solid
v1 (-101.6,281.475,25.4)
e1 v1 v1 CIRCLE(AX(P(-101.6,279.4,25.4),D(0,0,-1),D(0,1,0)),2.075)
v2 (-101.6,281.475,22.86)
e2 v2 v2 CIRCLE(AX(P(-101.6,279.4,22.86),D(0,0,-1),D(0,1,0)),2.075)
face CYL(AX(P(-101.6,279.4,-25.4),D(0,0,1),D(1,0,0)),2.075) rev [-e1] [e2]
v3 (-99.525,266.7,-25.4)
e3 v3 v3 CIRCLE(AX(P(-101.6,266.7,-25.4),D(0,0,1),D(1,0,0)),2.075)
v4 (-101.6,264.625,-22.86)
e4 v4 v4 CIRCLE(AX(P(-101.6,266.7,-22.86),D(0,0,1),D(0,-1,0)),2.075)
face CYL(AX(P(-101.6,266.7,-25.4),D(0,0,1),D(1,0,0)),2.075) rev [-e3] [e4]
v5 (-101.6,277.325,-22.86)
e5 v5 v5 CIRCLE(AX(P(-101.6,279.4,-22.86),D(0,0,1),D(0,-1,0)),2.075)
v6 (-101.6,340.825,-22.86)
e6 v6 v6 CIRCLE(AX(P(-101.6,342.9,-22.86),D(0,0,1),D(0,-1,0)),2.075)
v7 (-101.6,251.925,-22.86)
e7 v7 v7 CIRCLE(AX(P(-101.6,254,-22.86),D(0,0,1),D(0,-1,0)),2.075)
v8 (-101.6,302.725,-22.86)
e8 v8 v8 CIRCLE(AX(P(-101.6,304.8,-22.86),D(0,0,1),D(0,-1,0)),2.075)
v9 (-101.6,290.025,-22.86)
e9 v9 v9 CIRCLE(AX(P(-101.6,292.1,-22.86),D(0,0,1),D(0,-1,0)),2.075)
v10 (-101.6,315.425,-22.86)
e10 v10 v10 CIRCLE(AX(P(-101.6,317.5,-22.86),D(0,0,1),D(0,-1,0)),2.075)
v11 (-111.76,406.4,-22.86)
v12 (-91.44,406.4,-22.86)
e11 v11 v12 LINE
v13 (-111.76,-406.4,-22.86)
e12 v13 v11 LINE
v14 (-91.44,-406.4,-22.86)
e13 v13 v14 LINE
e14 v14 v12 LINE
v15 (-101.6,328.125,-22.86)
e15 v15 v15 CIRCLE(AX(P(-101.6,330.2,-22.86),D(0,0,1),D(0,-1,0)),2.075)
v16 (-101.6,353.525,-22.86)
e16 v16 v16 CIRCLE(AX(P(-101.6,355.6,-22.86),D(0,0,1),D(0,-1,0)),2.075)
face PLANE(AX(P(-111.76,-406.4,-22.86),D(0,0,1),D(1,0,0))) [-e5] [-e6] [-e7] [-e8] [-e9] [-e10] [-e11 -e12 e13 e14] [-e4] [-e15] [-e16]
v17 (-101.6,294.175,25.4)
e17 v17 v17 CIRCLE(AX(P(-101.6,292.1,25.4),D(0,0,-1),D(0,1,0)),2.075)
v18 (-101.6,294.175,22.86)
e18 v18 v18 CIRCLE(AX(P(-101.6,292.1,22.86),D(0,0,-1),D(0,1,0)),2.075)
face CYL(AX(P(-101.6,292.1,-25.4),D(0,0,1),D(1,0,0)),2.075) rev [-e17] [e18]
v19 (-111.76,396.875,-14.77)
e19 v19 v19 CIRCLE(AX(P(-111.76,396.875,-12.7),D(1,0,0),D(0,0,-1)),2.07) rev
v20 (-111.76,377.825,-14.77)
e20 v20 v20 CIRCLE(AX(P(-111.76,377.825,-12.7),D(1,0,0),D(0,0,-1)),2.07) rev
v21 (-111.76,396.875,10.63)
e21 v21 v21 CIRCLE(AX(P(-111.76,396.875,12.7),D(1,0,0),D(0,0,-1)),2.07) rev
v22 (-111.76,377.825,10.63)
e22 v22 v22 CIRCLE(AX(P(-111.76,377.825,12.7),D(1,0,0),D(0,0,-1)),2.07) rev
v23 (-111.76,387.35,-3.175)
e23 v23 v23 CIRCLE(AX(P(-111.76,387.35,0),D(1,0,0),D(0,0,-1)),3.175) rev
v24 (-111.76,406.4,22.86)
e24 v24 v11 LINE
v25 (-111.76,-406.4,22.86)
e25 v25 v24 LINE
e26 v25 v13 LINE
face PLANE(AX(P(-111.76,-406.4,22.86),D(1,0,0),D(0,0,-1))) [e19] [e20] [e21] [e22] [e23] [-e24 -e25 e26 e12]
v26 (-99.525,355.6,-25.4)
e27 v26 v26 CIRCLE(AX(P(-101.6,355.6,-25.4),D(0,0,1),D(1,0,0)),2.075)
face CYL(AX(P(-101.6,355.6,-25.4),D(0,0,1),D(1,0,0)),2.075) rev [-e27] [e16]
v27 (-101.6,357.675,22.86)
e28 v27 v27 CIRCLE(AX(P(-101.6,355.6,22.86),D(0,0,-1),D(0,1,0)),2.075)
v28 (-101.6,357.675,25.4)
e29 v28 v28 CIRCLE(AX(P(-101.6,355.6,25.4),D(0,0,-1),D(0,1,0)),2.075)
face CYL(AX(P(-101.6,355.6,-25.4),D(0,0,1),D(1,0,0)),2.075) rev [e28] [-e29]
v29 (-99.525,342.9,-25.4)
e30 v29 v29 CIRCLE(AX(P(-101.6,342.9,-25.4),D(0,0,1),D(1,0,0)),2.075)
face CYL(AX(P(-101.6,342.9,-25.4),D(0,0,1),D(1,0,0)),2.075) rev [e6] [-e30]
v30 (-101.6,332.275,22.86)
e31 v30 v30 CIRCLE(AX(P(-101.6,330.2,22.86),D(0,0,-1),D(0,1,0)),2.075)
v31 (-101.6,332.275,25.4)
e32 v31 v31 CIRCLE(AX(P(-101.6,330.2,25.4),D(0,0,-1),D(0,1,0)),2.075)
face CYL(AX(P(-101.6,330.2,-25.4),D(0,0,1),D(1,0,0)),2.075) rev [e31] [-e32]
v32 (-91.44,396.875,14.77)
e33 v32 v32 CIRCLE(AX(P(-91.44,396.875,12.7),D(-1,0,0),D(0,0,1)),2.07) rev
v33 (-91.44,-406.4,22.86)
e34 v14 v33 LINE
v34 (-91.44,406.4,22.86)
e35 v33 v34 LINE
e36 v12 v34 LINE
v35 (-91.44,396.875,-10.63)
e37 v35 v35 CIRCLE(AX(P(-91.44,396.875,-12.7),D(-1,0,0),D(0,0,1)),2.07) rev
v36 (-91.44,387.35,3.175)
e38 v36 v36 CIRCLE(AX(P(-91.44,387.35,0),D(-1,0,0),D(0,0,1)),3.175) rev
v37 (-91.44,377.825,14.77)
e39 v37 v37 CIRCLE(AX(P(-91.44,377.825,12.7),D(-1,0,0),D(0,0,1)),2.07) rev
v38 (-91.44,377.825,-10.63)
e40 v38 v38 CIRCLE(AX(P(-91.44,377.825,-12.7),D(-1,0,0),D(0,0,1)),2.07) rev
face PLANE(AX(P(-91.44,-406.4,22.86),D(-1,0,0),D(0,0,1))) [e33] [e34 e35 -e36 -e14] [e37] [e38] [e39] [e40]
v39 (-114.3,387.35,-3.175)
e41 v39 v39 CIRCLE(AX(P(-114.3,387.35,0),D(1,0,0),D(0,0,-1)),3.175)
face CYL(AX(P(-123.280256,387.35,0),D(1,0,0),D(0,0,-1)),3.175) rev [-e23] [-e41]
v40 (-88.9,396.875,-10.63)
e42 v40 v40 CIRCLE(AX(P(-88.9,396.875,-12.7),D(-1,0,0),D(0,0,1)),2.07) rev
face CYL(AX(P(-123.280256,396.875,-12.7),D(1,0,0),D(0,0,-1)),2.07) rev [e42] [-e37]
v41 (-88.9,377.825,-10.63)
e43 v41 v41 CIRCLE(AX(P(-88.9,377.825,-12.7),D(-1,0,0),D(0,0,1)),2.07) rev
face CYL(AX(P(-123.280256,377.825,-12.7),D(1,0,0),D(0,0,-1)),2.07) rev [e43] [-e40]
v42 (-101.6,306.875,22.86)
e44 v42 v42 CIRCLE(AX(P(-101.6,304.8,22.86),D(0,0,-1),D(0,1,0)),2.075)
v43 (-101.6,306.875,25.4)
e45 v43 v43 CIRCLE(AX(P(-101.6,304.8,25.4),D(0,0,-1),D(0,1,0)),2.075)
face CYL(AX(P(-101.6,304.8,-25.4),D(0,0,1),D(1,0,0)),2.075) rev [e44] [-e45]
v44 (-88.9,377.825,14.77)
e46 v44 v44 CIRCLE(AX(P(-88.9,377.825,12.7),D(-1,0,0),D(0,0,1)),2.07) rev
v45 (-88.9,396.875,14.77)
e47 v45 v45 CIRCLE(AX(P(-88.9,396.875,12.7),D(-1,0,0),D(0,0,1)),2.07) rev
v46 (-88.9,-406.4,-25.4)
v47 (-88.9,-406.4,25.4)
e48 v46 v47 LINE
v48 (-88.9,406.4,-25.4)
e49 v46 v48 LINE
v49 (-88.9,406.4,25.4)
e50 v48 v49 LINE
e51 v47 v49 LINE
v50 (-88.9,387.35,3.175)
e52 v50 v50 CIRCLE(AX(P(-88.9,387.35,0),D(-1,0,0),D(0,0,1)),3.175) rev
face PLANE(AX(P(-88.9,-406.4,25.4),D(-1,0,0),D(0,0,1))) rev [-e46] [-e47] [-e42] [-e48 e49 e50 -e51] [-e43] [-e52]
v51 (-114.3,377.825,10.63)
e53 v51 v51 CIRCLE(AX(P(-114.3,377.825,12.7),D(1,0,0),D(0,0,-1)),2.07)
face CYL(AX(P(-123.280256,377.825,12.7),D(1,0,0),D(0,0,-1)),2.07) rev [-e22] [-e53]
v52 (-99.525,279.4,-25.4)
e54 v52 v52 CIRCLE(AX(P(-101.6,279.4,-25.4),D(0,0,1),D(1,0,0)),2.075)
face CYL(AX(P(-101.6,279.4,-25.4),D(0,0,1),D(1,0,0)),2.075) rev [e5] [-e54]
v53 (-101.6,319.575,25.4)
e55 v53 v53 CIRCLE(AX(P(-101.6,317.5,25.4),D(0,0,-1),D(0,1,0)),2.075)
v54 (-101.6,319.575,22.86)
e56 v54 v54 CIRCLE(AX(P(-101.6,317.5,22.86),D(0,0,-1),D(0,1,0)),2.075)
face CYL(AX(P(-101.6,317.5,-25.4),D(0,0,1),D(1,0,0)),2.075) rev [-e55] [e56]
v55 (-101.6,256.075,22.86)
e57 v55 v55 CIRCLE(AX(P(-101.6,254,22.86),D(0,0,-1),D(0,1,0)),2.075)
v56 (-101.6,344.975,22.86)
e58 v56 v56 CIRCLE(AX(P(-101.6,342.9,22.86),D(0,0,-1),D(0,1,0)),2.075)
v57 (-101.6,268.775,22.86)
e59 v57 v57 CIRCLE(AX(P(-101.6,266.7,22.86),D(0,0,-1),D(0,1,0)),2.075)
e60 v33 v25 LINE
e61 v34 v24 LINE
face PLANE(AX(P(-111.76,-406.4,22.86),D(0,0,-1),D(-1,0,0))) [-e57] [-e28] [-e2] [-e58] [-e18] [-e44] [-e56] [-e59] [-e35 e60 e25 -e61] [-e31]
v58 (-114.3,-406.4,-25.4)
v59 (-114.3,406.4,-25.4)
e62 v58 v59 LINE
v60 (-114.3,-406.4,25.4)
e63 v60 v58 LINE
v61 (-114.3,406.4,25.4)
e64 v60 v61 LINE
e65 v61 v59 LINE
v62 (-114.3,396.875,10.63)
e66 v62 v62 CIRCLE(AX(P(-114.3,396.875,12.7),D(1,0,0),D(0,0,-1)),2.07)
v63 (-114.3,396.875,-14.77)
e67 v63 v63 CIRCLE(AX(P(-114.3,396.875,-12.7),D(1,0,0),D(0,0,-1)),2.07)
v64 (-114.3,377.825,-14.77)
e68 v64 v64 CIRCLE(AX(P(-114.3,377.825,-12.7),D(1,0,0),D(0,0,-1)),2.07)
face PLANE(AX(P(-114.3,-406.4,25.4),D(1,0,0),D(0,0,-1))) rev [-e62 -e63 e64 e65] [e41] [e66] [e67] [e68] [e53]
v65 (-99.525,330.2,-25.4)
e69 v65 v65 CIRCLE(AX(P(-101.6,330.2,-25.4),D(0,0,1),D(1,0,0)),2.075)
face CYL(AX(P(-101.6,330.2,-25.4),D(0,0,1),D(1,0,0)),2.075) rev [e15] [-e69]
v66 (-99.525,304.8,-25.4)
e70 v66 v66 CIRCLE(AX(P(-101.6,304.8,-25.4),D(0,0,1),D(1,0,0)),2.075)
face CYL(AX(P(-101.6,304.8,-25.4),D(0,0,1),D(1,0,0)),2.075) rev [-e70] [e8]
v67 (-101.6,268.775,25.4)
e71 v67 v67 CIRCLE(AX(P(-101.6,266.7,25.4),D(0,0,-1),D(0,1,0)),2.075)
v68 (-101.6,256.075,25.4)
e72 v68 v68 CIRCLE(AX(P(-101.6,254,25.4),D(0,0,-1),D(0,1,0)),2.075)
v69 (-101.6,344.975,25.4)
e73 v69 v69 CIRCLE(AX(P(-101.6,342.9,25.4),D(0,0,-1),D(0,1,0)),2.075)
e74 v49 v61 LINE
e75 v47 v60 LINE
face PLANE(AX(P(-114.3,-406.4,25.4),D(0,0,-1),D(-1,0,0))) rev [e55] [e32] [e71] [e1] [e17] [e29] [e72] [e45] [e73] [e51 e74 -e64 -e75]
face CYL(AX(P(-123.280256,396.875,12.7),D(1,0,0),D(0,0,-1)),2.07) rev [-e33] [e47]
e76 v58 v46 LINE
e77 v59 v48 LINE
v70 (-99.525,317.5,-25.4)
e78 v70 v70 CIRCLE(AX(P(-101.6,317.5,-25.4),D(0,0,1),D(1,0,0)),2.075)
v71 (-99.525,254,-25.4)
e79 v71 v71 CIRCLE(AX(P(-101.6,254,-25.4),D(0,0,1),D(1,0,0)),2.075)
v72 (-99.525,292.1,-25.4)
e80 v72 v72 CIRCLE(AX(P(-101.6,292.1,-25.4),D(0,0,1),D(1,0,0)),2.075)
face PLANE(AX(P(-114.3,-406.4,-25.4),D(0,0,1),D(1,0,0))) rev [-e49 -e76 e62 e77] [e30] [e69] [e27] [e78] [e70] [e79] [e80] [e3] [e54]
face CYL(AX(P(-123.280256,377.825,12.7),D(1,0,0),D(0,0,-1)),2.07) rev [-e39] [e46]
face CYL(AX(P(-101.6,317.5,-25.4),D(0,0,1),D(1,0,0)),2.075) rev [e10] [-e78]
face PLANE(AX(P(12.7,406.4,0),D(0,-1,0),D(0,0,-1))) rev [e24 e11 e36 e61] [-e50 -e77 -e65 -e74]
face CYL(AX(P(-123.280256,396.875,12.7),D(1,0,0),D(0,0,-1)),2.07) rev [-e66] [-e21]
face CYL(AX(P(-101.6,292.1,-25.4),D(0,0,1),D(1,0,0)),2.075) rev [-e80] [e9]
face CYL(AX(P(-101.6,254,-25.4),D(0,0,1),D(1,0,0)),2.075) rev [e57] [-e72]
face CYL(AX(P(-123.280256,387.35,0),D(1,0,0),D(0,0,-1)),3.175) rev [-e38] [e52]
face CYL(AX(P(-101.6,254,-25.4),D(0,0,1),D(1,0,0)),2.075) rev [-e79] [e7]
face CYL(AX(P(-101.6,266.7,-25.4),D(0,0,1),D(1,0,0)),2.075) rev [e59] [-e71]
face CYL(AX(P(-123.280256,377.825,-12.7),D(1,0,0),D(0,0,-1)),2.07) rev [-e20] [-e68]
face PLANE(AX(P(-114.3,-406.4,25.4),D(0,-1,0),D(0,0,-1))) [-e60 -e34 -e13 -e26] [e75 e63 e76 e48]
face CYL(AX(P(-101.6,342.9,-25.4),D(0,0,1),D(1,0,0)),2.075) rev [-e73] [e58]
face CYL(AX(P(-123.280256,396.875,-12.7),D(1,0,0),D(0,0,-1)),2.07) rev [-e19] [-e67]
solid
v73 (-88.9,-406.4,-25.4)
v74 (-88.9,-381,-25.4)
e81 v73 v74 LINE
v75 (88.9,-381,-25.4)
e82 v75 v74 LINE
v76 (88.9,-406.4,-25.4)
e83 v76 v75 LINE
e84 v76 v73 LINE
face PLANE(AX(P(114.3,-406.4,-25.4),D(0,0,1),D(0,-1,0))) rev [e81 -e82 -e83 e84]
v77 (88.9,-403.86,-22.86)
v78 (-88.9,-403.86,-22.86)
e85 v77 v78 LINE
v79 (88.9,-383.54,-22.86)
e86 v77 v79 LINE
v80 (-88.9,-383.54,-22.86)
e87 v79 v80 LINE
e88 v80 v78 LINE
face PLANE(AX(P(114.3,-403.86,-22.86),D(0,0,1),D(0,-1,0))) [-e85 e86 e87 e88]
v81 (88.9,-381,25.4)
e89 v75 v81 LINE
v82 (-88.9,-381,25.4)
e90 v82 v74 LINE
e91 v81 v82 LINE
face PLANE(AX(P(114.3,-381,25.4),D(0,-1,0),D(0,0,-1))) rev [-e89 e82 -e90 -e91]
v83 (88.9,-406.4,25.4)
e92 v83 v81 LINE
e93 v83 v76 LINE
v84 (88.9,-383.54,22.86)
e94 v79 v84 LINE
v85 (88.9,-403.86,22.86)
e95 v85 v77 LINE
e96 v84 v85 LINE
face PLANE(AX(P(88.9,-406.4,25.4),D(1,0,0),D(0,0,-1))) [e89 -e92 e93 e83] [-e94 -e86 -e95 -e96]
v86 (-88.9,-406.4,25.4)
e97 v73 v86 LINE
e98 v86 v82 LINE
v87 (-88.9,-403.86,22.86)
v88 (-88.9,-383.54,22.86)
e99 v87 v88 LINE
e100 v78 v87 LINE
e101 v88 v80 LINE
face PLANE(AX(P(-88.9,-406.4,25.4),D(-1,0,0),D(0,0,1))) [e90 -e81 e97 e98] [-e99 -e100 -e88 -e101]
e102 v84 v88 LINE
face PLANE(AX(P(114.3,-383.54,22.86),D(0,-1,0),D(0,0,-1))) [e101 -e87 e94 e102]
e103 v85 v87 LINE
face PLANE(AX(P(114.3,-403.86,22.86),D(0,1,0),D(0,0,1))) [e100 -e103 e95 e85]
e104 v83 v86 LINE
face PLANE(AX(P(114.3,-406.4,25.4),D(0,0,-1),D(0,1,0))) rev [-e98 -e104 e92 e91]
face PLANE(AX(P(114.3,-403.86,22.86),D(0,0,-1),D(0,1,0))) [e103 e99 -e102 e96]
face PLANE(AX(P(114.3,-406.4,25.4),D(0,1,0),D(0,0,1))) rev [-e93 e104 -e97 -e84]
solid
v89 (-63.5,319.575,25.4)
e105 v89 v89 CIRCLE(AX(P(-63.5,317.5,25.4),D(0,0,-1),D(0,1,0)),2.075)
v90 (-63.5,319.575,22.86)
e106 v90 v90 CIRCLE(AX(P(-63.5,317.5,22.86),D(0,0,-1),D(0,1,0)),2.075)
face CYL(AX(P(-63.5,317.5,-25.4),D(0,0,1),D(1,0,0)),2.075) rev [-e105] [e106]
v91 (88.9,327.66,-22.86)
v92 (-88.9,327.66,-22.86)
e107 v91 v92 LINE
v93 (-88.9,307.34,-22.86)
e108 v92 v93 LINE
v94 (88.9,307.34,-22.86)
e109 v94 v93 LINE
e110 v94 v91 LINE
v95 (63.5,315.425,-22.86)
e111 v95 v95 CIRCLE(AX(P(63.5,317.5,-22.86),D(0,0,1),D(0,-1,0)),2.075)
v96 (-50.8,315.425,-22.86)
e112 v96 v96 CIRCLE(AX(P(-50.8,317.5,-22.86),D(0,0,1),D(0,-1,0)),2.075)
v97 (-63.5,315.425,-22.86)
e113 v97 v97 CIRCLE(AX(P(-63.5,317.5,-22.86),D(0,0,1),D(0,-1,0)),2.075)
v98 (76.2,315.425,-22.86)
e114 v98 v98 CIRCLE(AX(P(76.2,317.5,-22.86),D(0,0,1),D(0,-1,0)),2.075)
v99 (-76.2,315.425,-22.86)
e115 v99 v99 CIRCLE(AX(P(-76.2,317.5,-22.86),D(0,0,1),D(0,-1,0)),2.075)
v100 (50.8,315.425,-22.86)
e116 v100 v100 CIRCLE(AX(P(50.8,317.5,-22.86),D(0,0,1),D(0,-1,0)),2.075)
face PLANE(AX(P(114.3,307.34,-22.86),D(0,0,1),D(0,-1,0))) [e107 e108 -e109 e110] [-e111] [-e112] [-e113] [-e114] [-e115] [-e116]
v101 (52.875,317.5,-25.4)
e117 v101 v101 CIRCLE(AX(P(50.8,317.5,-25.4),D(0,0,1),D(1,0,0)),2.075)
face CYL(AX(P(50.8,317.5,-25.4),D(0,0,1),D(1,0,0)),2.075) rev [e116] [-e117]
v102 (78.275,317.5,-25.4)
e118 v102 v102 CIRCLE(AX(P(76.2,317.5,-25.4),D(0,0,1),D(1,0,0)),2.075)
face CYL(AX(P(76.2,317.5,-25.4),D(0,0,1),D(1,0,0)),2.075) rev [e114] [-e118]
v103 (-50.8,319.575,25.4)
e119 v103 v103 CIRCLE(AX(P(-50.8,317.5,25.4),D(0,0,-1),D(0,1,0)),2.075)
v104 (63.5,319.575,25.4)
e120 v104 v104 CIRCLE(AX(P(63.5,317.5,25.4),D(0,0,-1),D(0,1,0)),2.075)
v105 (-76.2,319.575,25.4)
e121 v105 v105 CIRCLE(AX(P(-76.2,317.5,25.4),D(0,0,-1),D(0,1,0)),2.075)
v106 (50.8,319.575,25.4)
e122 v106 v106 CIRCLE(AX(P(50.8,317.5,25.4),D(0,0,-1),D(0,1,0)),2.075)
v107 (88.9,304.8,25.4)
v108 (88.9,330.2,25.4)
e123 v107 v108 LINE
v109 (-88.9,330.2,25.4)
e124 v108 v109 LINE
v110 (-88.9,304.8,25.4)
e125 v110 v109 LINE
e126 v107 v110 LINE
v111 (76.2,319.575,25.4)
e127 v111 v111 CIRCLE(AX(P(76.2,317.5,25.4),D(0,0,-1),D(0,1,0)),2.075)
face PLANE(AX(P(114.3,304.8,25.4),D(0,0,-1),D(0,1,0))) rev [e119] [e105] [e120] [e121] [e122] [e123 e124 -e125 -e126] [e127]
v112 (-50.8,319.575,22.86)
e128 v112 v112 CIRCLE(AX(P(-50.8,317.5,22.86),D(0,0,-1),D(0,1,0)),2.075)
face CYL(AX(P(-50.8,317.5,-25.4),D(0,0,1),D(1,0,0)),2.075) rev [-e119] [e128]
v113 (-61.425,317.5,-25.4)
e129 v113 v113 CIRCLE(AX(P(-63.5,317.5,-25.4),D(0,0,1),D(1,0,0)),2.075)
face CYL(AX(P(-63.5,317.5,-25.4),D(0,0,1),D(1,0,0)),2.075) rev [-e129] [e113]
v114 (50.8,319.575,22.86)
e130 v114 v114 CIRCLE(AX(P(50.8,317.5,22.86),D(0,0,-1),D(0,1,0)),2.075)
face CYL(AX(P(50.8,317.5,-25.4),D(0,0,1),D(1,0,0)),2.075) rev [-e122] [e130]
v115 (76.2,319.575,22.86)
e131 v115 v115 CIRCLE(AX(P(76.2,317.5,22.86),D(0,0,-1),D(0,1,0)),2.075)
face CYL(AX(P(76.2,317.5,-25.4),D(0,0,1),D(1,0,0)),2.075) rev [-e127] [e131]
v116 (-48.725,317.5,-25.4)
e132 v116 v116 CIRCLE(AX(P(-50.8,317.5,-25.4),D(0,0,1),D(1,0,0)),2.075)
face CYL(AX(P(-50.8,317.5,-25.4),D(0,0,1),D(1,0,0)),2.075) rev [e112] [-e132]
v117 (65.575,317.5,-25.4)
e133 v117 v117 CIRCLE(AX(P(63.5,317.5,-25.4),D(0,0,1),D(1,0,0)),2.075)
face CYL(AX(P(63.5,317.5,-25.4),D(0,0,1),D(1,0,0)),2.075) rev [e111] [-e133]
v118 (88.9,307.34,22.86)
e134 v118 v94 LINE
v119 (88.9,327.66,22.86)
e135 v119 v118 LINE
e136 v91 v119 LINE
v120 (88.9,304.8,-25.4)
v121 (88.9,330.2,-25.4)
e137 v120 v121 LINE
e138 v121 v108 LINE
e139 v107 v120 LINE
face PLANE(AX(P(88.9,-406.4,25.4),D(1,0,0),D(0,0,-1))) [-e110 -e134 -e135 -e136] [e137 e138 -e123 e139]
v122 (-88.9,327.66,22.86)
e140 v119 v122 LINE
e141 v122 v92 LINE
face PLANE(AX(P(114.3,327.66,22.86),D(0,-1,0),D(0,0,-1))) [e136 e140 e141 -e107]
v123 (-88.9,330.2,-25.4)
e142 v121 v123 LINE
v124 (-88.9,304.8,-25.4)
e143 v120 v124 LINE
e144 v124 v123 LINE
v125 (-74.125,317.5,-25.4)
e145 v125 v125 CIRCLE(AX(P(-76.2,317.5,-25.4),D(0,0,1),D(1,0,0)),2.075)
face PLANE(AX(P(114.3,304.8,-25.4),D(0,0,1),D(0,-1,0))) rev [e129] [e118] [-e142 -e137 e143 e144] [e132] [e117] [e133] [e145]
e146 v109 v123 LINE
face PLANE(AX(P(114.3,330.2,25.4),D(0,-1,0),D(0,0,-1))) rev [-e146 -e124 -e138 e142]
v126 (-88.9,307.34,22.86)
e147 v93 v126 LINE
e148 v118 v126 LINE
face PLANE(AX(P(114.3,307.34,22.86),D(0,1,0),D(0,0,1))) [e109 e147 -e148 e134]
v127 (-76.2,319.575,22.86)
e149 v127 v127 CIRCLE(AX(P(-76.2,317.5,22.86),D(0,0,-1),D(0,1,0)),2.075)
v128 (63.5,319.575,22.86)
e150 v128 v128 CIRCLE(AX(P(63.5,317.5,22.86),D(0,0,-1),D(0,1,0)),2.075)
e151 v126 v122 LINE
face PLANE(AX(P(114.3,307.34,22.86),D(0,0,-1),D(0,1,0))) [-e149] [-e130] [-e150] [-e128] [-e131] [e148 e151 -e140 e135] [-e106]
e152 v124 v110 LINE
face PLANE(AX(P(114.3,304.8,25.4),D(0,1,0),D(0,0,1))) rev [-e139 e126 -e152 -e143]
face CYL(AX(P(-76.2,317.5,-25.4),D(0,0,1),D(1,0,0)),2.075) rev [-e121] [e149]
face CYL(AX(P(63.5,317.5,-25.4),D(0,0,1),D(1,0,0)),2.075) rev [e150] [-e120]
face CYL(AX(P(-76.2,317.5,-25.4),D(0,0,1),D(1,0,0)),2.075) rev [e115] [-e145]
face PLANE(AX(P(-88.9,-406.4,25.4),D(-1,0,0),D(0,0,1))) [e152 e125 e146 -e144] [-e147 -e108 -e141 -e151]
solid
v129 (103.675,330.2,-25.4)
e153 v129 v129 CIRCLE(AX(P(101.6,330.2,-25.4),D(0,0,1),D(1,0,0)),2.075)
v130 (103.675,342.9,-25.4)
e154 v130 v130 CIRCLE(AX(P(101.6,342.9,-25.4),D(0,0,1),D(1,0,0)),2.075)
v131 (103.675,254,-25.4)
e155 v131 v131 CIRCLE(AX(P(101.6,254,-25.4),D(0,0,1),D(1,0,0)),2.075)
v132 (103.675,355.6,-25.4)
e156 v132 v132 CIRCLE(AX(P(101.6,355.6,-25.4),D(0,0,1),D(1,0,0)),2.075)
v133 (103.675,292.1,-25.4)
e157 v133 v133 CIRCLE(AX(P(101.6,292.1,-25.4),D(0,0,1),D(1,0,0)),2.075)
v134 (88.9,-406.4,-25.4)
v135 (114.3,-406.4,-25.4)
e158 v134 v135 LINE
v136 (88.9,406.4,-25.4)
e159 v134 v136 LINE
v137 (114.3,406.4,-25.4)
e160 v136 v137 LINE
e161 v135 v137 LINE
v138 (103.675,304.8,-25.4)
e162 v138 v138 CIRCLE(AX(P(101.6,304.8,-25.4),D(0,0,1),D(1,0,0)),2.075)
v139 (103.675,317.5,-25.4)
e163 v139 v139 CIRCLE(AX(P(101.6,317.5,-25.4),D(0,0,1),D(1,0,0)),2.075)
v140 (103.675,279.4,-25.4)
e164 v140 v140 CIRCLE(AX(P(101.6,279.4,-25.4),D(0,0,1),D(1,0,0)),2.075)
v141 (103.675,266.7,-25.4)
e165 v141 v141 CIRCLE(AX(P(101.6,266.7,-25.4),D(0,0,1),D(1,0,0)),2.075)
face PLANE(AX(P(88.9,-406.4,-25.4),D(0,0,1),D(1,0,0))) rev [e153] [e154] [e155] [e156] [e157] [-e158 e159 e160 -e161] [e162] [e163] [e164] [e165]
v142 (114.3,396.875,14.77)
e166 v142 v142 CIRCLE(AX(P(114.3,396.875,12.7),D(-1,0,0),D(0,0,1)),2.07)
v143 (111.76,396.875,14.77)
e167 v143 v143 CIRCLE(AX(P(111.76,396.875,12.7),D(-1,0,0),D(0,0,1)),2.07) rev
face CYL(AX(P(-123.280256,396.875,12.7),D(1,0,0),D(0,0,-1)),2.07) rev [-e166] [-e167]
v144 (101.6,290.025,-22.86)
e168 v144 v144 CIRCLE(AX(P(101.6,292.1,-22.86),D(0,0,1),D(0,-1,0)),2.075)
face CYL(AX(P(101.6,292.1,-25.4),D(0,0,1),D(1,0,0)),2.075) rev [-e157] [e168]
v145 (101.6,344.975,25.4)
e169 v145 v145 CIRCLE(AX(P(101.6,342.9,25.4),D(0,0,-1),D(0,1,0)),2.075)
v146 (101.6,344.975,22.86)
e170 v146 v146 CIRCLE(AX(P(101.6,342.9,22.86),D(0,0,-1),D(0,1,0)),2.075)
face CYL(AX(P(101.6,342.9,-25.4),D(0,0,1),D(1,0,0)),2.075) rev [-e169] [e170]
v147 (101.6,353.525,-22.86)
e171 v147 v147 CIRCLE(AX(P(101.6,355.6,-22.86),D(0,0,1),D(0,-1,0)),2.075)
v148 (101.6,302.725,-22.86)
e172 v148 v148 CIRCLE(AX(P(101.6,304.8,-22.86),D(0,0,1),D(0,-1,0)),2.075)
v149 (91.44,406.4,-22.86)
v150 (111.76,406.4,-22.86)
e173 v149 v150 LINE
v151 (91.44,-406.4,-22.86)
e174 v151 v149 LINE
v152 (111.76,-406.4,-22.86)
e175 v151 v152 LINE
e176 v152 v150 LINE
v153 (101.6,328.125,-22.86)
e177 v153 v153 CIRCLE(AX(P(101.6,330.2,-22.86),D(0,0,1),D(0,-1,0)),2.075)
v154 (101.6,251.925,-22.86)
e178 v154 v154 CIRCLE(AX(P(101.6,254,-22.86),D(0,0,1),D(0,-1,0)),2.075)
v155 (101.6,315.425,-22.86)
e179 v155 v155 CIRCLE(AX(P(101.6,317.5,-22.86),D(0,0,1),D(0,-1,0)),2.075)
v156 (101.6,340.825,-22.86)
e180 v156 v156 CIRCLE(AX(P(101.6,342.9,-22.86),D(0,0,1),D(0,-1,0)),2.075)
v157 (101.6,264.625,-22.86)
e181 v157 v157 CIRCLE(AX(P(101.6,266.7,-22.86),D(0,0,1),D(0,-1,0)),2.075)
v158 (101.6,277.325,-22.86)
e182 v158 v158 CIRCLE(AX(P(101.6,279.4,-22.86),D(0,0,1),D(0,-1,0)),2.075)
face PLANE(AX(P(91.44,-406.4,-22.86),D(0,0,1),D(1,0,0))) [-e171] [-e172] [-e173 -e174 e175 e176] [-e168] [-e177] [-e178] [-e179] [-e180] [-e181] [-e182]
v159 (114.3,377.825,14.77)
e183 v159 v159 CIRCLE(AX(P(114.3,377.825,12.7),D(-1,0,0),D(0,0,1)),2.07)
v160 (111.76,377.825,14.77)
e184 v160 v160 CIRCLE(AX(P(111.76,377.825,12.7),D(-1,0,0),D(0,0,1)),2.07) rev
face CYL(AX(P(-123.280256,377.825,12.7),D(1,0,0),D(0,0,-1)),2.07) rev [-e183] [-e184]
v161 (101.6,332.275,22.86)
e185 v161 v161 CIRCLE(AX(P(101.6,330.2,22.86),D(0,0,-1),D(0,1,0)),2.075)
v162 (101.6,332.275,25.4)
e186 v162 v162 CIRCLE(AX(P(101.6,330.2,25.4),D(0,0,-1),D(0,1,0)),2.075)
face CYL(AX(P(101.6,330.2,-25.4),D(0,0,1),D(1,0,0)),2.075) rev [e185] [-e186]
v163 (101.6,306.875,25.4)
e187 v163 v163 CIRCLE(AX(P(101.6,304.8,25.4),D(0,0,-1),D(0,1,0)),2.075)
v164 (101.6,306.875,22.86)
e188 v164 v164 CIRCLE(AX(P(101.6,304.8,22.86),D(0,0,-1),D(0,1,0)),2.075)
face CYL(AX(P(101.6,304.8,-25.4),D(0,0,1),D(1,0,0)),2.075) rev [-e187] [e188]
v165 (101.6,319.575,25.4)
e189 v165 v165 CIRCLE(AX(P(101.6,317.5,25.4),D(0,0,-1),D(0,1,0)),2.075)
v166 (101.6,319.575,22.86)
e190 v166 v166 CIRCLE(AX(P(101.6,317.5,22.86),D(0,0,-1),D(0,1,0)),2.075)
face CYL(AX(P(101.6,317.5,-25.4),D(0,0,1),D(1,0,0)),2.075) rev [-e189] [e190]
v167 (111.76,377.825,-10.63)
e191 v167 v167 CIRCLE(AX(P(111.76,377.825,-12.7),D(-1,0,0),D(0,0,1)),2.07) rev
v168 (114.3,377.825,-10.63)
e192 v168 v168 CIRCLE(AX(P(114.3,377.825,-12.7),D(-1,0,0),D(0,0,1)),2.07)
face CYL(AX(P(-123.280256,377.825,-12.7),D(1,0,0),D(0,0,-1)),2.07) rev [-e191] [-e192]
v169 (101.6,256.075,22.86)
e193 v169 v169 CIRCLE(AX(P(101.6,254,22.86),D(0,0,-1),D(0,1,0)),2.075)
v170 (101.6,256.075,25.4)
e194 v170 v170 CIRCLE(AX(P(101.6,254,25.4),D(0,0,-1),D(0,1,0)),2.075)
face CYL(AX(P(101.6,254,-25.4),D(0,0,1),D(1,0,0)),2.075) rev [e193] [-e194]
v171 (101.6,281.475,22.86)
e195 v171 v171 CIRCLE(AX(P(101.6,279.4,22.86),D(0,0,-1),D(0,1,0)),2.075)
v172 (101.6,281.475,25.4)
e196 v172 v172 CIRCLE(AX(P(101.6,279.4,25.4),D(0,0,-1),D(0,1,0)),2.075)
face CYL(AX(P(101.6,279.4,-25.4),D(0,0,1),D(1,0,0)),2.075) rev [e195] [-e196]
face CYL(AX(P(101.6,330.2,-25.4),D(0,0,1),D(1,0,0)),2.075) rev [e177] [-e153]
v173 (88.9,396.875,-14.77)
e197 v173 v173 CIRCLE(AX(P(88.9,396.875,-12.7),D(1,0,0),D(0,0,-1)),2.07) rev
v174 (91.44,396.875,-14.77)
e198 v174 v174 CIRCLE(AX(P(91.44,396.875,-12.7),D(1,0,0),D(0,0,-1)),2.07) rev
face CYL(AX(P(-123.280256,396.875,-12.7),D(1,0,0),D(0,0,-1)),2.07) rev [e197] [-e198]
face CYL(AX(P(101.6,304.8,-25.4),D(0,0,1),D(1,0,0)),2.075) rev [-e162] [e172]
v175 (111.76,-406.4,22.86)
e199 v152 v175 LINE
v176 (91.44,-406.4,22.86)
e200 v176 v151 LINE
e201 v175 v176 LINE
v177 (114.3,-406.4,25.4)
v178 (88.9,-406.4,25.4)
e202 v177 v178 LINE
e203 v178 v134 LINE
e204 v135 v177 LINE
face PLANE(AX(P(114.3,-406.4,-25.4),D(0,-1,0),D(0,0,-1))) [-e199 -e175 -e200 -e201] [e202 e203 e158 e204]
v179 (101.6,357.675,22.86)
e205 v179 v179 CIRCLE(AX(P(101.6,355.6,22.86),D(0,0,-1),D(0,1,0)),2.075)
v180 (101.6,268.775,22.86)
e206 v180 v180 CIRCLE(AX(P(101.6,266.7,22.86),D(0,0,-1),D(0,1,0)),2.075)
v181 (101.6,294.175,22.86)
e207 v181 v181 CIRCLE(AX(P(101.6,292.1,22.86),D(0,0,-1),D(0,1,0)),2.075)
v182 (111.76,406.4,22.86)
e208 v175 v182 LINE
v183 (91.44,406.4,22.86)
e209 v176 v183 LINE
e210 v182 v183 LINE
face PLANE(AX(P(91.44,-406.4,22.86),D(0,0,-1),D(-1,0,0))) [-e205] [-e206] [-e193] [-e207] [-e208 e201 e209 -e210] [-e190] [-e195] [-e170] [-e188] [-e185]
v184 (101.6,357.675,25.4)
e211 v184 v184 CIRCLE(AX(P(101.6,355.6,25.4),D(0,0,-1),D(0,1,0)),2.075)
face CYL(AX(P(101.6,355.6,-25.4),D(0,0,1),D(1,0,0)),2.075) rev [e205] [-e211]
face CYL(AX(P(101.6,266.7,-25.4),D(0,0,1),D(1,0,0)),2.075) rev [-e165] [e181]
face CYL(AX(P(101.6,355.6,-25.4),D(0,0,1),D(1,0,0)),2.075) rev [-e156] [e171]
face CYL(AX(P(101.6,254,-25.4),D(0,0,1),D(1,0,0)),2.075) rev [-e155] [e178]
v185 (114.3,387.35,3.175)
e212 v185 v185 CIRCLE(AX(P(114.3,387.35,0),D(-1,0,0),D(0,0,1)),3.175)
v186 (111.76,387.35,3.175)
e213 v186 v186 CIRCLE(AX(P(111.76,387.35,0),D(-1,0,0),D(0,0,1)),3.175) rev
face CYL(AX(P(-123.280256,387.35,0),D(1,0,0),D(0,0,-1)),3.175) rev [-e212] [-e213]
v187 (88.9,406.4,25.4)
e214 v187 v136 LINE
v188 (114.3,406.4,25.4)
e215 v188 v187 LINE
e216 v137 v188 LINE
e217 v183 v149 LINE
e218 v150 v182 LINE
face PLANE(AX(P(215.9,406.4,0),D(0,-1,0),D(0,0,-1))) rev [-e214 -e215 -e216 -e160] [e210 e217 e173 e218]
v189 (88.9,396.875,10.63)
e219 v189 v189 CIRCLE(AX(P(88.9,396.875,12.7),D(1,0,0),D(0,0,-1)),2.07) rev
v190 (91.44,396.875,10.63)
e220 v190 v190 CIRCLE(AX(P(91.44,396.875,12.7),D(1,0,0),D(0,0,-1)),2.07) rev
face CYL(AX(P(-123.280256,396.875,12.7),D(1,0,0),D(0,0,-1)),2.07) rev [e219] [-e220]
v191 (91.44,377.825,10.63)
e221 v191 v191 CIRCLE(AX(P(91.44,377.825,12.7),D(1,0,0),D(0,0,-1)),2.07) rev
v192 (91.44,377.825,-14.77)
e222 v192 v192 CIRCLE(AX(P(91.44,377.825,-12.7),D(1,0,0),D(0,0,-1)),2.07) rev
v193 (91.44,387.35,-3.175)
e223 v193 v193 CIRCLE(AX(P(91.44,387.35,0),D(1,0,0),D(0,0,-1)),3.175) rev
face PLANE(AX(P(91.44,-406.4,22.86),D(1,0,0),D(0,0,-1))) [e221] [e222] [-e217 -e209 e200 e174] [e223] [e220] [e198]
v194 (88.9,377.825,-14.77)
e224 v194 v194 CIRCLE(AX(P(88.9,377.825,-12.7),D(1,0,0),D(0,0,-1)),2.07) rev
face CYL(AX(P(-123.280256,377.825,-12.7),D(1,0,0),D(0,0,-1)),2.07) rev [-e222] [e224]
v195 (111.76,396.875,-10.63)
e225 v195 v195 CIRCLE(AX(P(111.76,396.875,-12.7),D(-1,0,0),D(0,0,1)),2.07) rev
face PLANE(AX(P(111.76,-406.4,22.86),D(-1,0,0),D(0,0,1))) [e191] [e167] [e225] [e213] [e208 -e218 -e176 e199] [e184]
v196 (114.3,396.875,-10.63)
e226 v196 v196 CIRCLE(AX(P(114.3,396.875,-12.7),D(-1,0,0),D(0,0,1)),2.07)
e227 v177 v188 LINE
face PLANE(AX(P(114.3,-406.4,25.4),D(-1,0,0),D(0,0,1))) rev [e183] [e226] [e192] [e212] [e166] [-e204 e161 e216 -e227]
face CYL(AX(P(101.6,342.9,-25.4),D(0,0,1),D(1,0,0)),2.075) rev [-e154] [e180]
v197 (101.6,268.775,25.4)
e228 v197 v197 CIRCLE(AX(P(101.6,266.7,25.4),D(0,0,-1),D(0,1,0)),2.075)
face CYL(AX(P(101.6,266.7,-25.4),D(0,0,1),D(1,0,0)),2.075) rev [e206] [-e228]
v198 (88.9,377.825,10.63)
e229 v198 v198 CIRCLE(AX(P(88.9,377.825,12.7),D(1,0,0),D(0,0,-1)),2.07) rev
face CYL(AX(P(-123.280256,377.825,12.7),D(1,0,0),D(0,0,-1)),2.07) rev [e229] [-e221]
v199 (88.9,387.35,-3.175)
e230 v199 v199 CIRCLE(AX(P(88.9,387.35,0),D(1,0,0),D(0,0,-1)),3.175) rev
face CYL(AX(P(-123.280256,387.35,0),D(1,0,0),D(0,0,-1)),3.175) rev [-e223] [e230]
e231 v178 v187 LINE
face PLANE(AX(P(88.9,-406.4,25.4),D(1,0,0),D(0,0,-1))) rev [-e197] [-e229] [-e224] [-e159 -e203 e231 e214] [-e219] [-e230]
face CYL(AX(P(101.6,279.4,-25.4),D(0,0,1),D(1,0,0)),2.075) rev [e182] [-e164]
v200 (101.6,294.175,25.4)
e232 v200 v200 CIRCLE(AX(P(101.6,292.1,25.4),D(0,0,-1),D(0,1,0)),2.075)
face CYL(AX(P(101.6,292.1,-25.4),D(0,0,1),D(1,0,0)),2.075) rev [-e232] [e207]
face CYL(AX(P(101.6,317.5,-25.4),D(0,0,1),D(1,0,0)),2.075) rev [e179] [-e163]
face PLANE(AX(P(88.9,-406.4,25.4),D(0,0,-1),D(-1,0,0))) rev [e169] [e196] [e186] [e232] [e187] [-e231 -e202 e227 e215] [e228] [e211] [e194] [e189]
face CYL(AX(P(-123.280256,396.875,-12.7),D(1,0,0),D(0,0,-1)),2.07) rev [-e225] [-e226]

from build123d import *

# Parameters (mm, degrees)
VERSAFRAME_START                             = -114.3
VERSAFRAME_VERSAFRAME_2_X_1_X_0_1_1_OUT_W    = 812.8
VERSAFRAME_VERSAFRAME_2_X_1_X_0_1_1_OUT_H    = 50.8
VERSAFRAME_VERSAFRAME_2_X_1_X_0_1_1_DEPTH    = 2.54
VERSAFRAME_START_2                           = -91.44
VERSAFRAME_VERSAFRAME_2_X_1_X_0_1_1_2_O_W    = 812.8
VERSAFRAME_VERSAFRAME_2_X_1_X_0_1_1_2_O_H    = 50.8
VERSAFRAME_VERSAFRAME_2_X_1_X_0_1_1_2_DEPTH  = 2.54
VERSAFRAME_START_3                           = -111.76
VERSAFRAME_VERSAFRAME_2_X_1_X_0_1_1_3_O_W    = 812.8
VERSAFRAME_VERSAFRAME_2_X_1_X_0_1_1_3_O_H    = 2.54
VERSAFRAME_VERSAFRAME_2_X_1_X_0_1_1_3_DEPTH  = 20.32
VERSAFRAME_START_4                           = -406.4
VERSAFRAME_VERSAFRAME_2_X_1_X_0_1_1_4_O_W    = 177.8
VERSAFRAME_VERSAFRAME_2_X_1_X_0_1_1_4_O_H    = 50.8
VERSAFRAME_VERSAFRAME_2_X_1_X_0_1_1_4_DEPTH  = 2.54
VERSAFRAME_START_5                           = -383.54
VERSAFRAME_VERSAFRAME_2_X_1_X_0_1_1_5_O_W    = 177.8
VERSAFRAME_VERSAFRAME_2_X_1_X_0_1_1_5_O_H    = 50.8
VERSAFRAME_VERSAFRAME_2_X_1_X_0_1_1_5_DEPTH  = 2.54
VERSAFRAME_START_6                           = -403.86
VERSAFRAME_VERSAFRAME_2_X_1_X_0_1_1_6_O_W    = 177.8
VERSAFRAME_VERSAFRAME_2_X_1_X_0_1_1_6_O_H    = 2.54
VERSAFRAME_VERSAFRAME_2_X_1_X_0_1_1_6_DEPTH  = 20.32
VERSAFRAME_START_7                           = 88.9
VERSAFRAME_VERSAFRAME_2_X_1_X_0_1_1_7_O_W    = 812.8
VERSAFRAME_VERSAFRAME_2_X_1_X_0_1_1_7_O_H    = 50.8
VERSAFRAME_VERSAFRAME_2_X_1_X_0_1_1_7_DEPTH  = 2.54
VERSAFRAME_START_8                           = 111.76
VERSAFRAME_VERSAFRAME_2_X_1_X_0_1_1_8_O_W    = 812.8
VERSAFRAME_VERSAFRAME_2_X_1_X_0_1_1_8_O_H    = 50.8
VERSAFRAME_VERSAFRAME_2_X_1_X_0_1_1_8_DEPTH  = 2.54
VERSAFRAME_START_9                           = 91.44
VERSAFRAME_VERSAFRAME_2_X_1_X_0_1_1_9_O_W    = 812.8
VERSAFRAME_VERSAFRAME_2_X_1_X_0_1_1_9_O_H    = 2.54
VERSAFRAME_VERSAFRAME_2_X_1_X_0_1_1_9_DEPTH  = 20.32
VERSAFRAME_START_10                          = 304.8
VERSAFRAME_VERSAFRAME_2_X_1_X_0_1_1_11_W     = 177.8
VERSAFRAME_VERSAFRAME_2_X_1_X_0_1_1_11_H     = 50.8
VERSAFRAME_VERSAFRAME_2_X_1_X_0_1_1_10_DEPTH = 2.54
VERSAFRAME_START_11                          = 327.66
VERSAFRAME_VERSAFRAME_2_X_1_X_0_1_1_13_W     = 177.8
VERSAFRAME_VERSAFRAME_2_X_1_X_0_1_1_13_H     = 50.8
VERSAFRAME_VERSAFRAME_2_X_1_X_0_1_1_12_DEPTH = 2.54
VERSAFRAME_START_12                          = 307.34
VERSAFRAME_VERSAFRAME_2_X_1_X_0_1_1_15_W     = 177.8
VERSAFRAME_VERSAFRAME_2_X_1_X_0_1_1_15_H     = 2.54
VERSAFRAME_VERSAFRAME_2_X_1_X_0_1_1_14_DEPTH = 20.32
SKETCH2_R                                    = 2.07
SKETCH2_R_2                                  = 3.175
CUT_EXTRUDE1_DEPTH                           = 228.6
CUT_EXTRUDE2_DEPTH                           = 426.212993687
CUT_EXTRUDE2_DEPTH_BACK                      = 426.212993687
SKETCH4_R                                    = 2.075


# Read off the part's stored shape, not the designer's step: Versaframe VERSAFRAME 2 X 1 X 0.1 (1)
with BuildPart() as part:
    # Versaframe VERSAFRAME 2 X 1 X 0.1 (1) out → Versaframe VERSAFRAME 2 X 1 X 0.1 (1) (new body)
    with BuildSketch(Plane.YZ.offset(VERSAFRAME_START)):
        Rectangle(VERSAFRAME_VERSAFRAME_2_X_1_X_0_1_1_OUT_W, VERSAFRAME_VERSAFRAME_2_X_1_X_0_1_1_OUT_H)
    extrude(amount=VERSAFRAME_VERSAFRAME_2_X_1_X_0_1_1_DEPTH)

    # Versaframe VERSAFRAME 2 X 1 X 0.1 _1 2 o → Versaframe VERSAFRAME 2 X 1 X 0.1 _1 2 (add)
    with BuildSketch(Plane.YZ.offset(VERSAFRAME_START_2)):
        Rectangle(VERSAFRAME_VERSAFRAME_2_X_1_X_0_1_1_2_O_W, VERSAFRAME_VERSAFRAME_2_X_1_X_0_1_1_2_O_H)
    extrude(amount=VERSAFRAME_VERSAFRAME_2_X_1_X_0_1_1_2_DEPTH)

    # Versaframe VERSAFRAME 2 X 1 X 0.1 _1 3 o → Versaframe VERSAFRAME 2 X 1 X 0.1 _1 3 (add)
    with BuildSketch(Plane.YZ.offset(VERSAFRAME_START_3)):
        with Locations((0, 24.13)):
            Rectangle(VERSAFRAME_VERSAFRAME_2_X_1_X_0_1_1_3_O_W, VERSAFRAME_VERSAFRAME_2_X_1_X_0_1_1_3_O_H)
        with Locations((0, -24.13)):
            Rectangle(VERSAFRAME_VERSAFRAME_2_X_1_X_0_1_1_3_O_W, VERSAFRAME_VERSAFRAME_2_X_1_X_0_1_1_3_O_H)
    extrude(amount=VERSAFRAME_VERSAFRAME_2_X_1_X_0_1_1_3_DEPTH)


with BuildPart() as body_2:
    # Versaframe VERSAFRAME 2 X 1 X 0.1 _1 4 o → Versaframe VERSAFRAME 2 X 1 X 0.1 _1 4 (new body)
    with BuildSketch(Plane(origin=(0, 0, 0), x_dir=(1, 0, 0), z_dir=(0, 1, 0)).offset(VERSAFRAME_START_4)):
        Rectangle(VERSAFRAME_VERSAFRAME_2_X_1_X_0_1_1_4_O_W, VERSAFRAME_VERSAFRAME_2_X_1_X_0_1_1_4_O_H)
    extrude(amount=VERSAFRAME_VERSAFRAME_2_X_1_X_0_1_1_4_DEPTH)

    # Versaframe VERSAFRAME 2 X 1 X 0.1 _1 5 o → Versaframe VERSAFRAME 2 X 1 X 0.1 _1 5 (add)
    with BuildSketch(Plane(origin=(0, 0, 0), x_dir=(1, 0, 0), z_dir=(0, 1, 0)).offset(VERSAFRAME_START_5)):
        Rectangle(VERSAFRAME_VERSAFRAME_2_X_1_X_0_1_1_5_O_W, VERSAFRAME_VERSAFRAME_2_X_1_X_0_1_1_5_O_H)
    extrude(amount=VERSAFRAME_VERSAFRAME_2_X_1_X_0_1_1_5_DEPTH)

    # Versaframe VERSAFRAME 2 X 1 X 0.1 _1 6 o → Versaframe VERSAFRAME 2 X 1 X 0.1 _1 6 (add)
    with BuildSketch(Plane(origin=(0, 0, 0), x_dir=(1, 0, 0), z_dir=(0, 1, 0)).offset(VERSAFRAME_START_6)):
        with Locations((0, 24.13)):
            Rectangle(VERSAFRAME_VERSAFRAME_2_X_1_X_0_1_1_6_O_W, VERSAFRAME_VERSAFRAME_2_X_1_X_0_1_1_6_O_H)
        with Locations((0, -24.13)):
            Rectangle(VERSAFRAME_VERSAFRAME_2_X_1_X_0_1_1_6_O_W, VERSAFRAME_VERSAFRAME_2_X_1_X_0_1_1_6_O_H)
    extrude(amount=VERSAFRAME_VERSAFRAME_2_X_1_X_0_1_1_6_DEPTH)


with BuildPart() as body_3:
    # Versaframe VERSAFRAME 2 X 1 X 0.1 _1 7 o → Versaframe VERSAFRAME 2 X 1 X 0.1 _1 7 (new body)
    with BuildSketch(Plane.YZ.offset(VERSAFRAME_START_7)):
        Rectangle(VERSAFRAME_VERSAFRAME_2_X_1_X_0_1_1_7_O_W, VERSAFRAME_VERSAFRAME_2_X_1_X_0_1_1_7_O_H)
    extrude(amount=VERSAFRAME_VERSAFRAME_2_X_1_X_0_1_1_7_DEPTH)

    # Versaframe VERSAFRAME 2 X 1 X 0.1 _1 8 o → Versaframe VERSAFRAME 2 X 1 X 0.1 _1 8 (add)
    with BuildSketch(Plane.YZ.offset(VERSAFRAME_START_8)):
        Rectangle(VERSAFRAME_VERSAFRAME_2_X_1_X_0_1_1_8_O_W, VERSAFRAME_VERSAFRAME_2_X_1_X_0_1_1_8_O_H)
    extrude(amount=VERSAFRAME_VERSAFRAME_2_X_1_X_0_1_1_8_DEPTH)

    # Versaframe VERSAFRAME 2 X 1 X 0.1 _1 9 o → Versaframe VERSAFRAME 2 X 1 X 0.1 _1 9 (add)
    with BuildSketch(Plane.YZ.offset(VERSAFRAME_START_9)):
        with Locations((0, 24.13)):
            Rectangle(VERSAFRAME_VERSAFRAME_2_X_1_X_0_1_1_9_O_W, VERSAFRAME_VERSAFRAME_2_X_1_X_0_1_1_9_O_H)
        with Locations((0, -24.13)):
            Rectangle(VERSAFRAME_VERSAFRAME_2_X_1_X_0_1_1_9_O_W, VERSAFRAME_VERSAFRAME_2_X_1_X_0_1_1_9_O_H)
    extrude(amount=VERSAFRAME_VERSAFRAME_2_X_1_X_0_1_1_9_DEPTH)


with BuildPart() as body_4:
    # Versaframe VERSAFRAME 2 X 1 X 0.1 _1 11 → Versaframe VERSAFRAME 2 X 1 X 0.1 _1 10 (new body)
    with BuildSketch(Plane(origin=(0, 0, 0), x_dir=(1, 0, 0), z_dir=(0, 1, 0)).offset(VERSAFRAME_START_10)):
        Rectangle(VERSAFRAME_VERSAFRAME_2_X_1_X_0_1_1_11_W, VERSAFRAME_VERSAFRAME_2_X_1_X_0_1_1_11_H)
    extrude(amount=VERSAFRAME_VERSAFRAME_2_X_1_X_0_1_1_10_DEPTH)

    # Versaframe VERSAFRAME 2 X 1 X 0.1 _1 13 → Versaframe VERSAFRAME 2 X 1 X 0.1 _1 12 (add)
    with BuildSketch(Plane(origin=(0, 0, 0), x_dir=(1, 0, 0), z_dir=(0, 1, 0)).offset(VERSAFRAME_START_11)):
        Rectangle(VERSAFRAME_VERSAFRAME_2_X_1_X_0_1_1_13_W, VERSAFRAME_VERSAFRAME_2_X_1_X_0_1_1_13_H)
    extrude(amount=VERSAFRAME_VERSAFRAME_2_X_1_X_0_1_1_12_DEPTH)

    # Versaframe VERSAFRAME 2 X 1 X 0.1 _1 15 → Versaframe VERSAFRAME 2 X 1 X 0.1 _1 14 (add)
    with BuildSketch(Plane(origin=(0, 0, 0), x_dir=(1, 0, 0), z_dir=(0, 1, 0)).offset(VERSAFRAME_START_12)):
        with Locations((0, 24.13)):
            Rectangle(VERSAFRAME_VERSAFRAME_2_X_1_X_0_1_1_15_W, VERSAFRAME_VERSAFRAME_2_X_1_X_0_1_1_15_H)
        with Locations((0, -24.13)):
            Rectangle(VERSAFRAME_VERSAFRAME_2_X_1_X_0_1_1_15_W, VERSAFRAME_VERSAFRAME_2_X_1_X_0_1_1_15_H)
    extrude(amount=VERSAFRAME_VERSAFRAME_2_X_1_X_0_1_1_14_DEPTH)


with BuildPart() as cut_extrude1_tool:
    # Sketch2 → Cut-Extrude1 (new body)
    with BuildSketch(Plane(origin=(114.3, 0, 0), x_dir=(0, 0, -1), z_dir=(1, 0, 0))):
        with Locations((-12.7, 396.875)):
            Circle(SKETCH2_R)
        with Locations((-12.7, 377.825)):
            Circle(SKETCH2_R)
        with Locations((12.7, 396.875)):
            Circle(SKETCH2_R)
        with Locations((0, 387.35)):
            Circle(SKETCH2_R_2)
        with Locations((12.7, 377.825)):
            Circle(SKETCH2_R)
    extrude(amount=-CUT_EXTRUDE1_DEPTH)


with BuildPart() as part_1:
    add(part.part)

    # Cut-Extrude1: cut by cut_extrude1_tool
    add(cut_extrude1_tool.part, mode=Mode.SUBTRACT)


with BuildPart() as body_3_1:
    add(body_3.part)

    # Cut-Extrude1: cut by cut_extrude1_tool
    add(cut_extrude1_tool.part, mode=Mode.SUBTRACT)


with BuildPart() as cut_extrude2_tool:
    # Sketch4 → Cut-Extrude2 (new, two sides: drawn at the far end of the back side and taken through both)
    with BuildSketch(Plane.XY.offset(25.4).offset(-CUT_EXTRUDE2_DEPTH_BACK)):
        with Locations((-101.6, 355.6)):
            Circle(SKETCH4_R)
        with Locations((-101.6, 342.9)):
            Circle(SKETCH4_R)
        with Locations((-101.6, 330.2)):
            Circle(SKETCH4_R)
        with Locations((-101.6, 317.5)):
            Circle(SKETCH4_R)
        with Locations((-101.6, 304.8)):
            Circle(SKETCH4_R)
        with Locations((-101.6, 292.1)):
            Circle(SKETCH4_R)
        with Locations((-101.6, 279.4)):
            Circle(SKETCH4_R)
        with Locations((-101.6, 266.7)):
            Circle(SKETCH4_R)
        with Locations((-101.6, 254)):
            Circle(SKETCH4_R)
        with Locations(Location((-76.2, 317.5, 0), (0, 0, 90))):
            Circle(SKETCH4_R)
        with Locations(Location((-63.5, 317.5, 0), (0, 0, 90))):
            Circle(SKETCH4_R)
        with Locations(Location((-50.8, 317.5, 0), (0, 0, 90))):
            Circle(SKETCH4_R)
        with Locations((101.6, 254)):
            Circle(SKETCH4_R)
        with Locations((101.6, 266.7)):
            Circle(SKETCH4_R)
        with Locations((101.6, 279.4)):
            Circle(SKETCH4_R)
        with Locations((101.6, 292.1)):
            Circle(SKETCH4_R)
        with Locations((101.6, 304.8)):
            Circle(SKETCH4_R)
        with Locations((101.6, 317.5)):
            Circle(SKETCH4_R)
        with Locations((101.6, 330.2)):
            Circle(SKETCH4_R)
        with Locations((101.6, 342.9)):
            Circle(SKETCH4_R)
        with Locations(Location((50.8, 317.5, 0), (0, 0, 90))):
            Circle(SKETCH4_R)
        with Locations(Location((63.5, 317.5, 0), (0, 0, 90))):
            Circle(SKETCH4_R)
        with Locations(Location((76.2, 317.5, 0), (0, 0, 90))):
            Circle(SKETCH4_R)
        with Locations((101.6, 355.6)):
            Circle(SKETCH4_R)
    extrude(amount=CUT_EXTRUDE2_DEPTH + CUT_EXTRUDE2_DEPTH_BACK)


with BuildPart() as part_2:
    add(part_1.part)

    # Cut-Extrude2: cut by cut_extrude2_tool
    add(cut_extrude2_tool.part, mode=Mode.SUBTRACT)


with BuildPart() as body_3_2:
    add(body_3_1.part)

    # Cut-Extrude2: cut by cut_extrude2_tool
    add(cut_extrude2_tool.part, mode=Mode.SUBTRACT)


with BuildPart() as body_4_1:
    add(body_4.part)

    # Cut-Extrude2: cut by cut_extrude2_tool
    add(cut_extrude2_tool.part, mode=Mode.SUBTRACT)


solid = Compound([body_2.part, part_2.part, body_3_2.part, body_4_1.part])
